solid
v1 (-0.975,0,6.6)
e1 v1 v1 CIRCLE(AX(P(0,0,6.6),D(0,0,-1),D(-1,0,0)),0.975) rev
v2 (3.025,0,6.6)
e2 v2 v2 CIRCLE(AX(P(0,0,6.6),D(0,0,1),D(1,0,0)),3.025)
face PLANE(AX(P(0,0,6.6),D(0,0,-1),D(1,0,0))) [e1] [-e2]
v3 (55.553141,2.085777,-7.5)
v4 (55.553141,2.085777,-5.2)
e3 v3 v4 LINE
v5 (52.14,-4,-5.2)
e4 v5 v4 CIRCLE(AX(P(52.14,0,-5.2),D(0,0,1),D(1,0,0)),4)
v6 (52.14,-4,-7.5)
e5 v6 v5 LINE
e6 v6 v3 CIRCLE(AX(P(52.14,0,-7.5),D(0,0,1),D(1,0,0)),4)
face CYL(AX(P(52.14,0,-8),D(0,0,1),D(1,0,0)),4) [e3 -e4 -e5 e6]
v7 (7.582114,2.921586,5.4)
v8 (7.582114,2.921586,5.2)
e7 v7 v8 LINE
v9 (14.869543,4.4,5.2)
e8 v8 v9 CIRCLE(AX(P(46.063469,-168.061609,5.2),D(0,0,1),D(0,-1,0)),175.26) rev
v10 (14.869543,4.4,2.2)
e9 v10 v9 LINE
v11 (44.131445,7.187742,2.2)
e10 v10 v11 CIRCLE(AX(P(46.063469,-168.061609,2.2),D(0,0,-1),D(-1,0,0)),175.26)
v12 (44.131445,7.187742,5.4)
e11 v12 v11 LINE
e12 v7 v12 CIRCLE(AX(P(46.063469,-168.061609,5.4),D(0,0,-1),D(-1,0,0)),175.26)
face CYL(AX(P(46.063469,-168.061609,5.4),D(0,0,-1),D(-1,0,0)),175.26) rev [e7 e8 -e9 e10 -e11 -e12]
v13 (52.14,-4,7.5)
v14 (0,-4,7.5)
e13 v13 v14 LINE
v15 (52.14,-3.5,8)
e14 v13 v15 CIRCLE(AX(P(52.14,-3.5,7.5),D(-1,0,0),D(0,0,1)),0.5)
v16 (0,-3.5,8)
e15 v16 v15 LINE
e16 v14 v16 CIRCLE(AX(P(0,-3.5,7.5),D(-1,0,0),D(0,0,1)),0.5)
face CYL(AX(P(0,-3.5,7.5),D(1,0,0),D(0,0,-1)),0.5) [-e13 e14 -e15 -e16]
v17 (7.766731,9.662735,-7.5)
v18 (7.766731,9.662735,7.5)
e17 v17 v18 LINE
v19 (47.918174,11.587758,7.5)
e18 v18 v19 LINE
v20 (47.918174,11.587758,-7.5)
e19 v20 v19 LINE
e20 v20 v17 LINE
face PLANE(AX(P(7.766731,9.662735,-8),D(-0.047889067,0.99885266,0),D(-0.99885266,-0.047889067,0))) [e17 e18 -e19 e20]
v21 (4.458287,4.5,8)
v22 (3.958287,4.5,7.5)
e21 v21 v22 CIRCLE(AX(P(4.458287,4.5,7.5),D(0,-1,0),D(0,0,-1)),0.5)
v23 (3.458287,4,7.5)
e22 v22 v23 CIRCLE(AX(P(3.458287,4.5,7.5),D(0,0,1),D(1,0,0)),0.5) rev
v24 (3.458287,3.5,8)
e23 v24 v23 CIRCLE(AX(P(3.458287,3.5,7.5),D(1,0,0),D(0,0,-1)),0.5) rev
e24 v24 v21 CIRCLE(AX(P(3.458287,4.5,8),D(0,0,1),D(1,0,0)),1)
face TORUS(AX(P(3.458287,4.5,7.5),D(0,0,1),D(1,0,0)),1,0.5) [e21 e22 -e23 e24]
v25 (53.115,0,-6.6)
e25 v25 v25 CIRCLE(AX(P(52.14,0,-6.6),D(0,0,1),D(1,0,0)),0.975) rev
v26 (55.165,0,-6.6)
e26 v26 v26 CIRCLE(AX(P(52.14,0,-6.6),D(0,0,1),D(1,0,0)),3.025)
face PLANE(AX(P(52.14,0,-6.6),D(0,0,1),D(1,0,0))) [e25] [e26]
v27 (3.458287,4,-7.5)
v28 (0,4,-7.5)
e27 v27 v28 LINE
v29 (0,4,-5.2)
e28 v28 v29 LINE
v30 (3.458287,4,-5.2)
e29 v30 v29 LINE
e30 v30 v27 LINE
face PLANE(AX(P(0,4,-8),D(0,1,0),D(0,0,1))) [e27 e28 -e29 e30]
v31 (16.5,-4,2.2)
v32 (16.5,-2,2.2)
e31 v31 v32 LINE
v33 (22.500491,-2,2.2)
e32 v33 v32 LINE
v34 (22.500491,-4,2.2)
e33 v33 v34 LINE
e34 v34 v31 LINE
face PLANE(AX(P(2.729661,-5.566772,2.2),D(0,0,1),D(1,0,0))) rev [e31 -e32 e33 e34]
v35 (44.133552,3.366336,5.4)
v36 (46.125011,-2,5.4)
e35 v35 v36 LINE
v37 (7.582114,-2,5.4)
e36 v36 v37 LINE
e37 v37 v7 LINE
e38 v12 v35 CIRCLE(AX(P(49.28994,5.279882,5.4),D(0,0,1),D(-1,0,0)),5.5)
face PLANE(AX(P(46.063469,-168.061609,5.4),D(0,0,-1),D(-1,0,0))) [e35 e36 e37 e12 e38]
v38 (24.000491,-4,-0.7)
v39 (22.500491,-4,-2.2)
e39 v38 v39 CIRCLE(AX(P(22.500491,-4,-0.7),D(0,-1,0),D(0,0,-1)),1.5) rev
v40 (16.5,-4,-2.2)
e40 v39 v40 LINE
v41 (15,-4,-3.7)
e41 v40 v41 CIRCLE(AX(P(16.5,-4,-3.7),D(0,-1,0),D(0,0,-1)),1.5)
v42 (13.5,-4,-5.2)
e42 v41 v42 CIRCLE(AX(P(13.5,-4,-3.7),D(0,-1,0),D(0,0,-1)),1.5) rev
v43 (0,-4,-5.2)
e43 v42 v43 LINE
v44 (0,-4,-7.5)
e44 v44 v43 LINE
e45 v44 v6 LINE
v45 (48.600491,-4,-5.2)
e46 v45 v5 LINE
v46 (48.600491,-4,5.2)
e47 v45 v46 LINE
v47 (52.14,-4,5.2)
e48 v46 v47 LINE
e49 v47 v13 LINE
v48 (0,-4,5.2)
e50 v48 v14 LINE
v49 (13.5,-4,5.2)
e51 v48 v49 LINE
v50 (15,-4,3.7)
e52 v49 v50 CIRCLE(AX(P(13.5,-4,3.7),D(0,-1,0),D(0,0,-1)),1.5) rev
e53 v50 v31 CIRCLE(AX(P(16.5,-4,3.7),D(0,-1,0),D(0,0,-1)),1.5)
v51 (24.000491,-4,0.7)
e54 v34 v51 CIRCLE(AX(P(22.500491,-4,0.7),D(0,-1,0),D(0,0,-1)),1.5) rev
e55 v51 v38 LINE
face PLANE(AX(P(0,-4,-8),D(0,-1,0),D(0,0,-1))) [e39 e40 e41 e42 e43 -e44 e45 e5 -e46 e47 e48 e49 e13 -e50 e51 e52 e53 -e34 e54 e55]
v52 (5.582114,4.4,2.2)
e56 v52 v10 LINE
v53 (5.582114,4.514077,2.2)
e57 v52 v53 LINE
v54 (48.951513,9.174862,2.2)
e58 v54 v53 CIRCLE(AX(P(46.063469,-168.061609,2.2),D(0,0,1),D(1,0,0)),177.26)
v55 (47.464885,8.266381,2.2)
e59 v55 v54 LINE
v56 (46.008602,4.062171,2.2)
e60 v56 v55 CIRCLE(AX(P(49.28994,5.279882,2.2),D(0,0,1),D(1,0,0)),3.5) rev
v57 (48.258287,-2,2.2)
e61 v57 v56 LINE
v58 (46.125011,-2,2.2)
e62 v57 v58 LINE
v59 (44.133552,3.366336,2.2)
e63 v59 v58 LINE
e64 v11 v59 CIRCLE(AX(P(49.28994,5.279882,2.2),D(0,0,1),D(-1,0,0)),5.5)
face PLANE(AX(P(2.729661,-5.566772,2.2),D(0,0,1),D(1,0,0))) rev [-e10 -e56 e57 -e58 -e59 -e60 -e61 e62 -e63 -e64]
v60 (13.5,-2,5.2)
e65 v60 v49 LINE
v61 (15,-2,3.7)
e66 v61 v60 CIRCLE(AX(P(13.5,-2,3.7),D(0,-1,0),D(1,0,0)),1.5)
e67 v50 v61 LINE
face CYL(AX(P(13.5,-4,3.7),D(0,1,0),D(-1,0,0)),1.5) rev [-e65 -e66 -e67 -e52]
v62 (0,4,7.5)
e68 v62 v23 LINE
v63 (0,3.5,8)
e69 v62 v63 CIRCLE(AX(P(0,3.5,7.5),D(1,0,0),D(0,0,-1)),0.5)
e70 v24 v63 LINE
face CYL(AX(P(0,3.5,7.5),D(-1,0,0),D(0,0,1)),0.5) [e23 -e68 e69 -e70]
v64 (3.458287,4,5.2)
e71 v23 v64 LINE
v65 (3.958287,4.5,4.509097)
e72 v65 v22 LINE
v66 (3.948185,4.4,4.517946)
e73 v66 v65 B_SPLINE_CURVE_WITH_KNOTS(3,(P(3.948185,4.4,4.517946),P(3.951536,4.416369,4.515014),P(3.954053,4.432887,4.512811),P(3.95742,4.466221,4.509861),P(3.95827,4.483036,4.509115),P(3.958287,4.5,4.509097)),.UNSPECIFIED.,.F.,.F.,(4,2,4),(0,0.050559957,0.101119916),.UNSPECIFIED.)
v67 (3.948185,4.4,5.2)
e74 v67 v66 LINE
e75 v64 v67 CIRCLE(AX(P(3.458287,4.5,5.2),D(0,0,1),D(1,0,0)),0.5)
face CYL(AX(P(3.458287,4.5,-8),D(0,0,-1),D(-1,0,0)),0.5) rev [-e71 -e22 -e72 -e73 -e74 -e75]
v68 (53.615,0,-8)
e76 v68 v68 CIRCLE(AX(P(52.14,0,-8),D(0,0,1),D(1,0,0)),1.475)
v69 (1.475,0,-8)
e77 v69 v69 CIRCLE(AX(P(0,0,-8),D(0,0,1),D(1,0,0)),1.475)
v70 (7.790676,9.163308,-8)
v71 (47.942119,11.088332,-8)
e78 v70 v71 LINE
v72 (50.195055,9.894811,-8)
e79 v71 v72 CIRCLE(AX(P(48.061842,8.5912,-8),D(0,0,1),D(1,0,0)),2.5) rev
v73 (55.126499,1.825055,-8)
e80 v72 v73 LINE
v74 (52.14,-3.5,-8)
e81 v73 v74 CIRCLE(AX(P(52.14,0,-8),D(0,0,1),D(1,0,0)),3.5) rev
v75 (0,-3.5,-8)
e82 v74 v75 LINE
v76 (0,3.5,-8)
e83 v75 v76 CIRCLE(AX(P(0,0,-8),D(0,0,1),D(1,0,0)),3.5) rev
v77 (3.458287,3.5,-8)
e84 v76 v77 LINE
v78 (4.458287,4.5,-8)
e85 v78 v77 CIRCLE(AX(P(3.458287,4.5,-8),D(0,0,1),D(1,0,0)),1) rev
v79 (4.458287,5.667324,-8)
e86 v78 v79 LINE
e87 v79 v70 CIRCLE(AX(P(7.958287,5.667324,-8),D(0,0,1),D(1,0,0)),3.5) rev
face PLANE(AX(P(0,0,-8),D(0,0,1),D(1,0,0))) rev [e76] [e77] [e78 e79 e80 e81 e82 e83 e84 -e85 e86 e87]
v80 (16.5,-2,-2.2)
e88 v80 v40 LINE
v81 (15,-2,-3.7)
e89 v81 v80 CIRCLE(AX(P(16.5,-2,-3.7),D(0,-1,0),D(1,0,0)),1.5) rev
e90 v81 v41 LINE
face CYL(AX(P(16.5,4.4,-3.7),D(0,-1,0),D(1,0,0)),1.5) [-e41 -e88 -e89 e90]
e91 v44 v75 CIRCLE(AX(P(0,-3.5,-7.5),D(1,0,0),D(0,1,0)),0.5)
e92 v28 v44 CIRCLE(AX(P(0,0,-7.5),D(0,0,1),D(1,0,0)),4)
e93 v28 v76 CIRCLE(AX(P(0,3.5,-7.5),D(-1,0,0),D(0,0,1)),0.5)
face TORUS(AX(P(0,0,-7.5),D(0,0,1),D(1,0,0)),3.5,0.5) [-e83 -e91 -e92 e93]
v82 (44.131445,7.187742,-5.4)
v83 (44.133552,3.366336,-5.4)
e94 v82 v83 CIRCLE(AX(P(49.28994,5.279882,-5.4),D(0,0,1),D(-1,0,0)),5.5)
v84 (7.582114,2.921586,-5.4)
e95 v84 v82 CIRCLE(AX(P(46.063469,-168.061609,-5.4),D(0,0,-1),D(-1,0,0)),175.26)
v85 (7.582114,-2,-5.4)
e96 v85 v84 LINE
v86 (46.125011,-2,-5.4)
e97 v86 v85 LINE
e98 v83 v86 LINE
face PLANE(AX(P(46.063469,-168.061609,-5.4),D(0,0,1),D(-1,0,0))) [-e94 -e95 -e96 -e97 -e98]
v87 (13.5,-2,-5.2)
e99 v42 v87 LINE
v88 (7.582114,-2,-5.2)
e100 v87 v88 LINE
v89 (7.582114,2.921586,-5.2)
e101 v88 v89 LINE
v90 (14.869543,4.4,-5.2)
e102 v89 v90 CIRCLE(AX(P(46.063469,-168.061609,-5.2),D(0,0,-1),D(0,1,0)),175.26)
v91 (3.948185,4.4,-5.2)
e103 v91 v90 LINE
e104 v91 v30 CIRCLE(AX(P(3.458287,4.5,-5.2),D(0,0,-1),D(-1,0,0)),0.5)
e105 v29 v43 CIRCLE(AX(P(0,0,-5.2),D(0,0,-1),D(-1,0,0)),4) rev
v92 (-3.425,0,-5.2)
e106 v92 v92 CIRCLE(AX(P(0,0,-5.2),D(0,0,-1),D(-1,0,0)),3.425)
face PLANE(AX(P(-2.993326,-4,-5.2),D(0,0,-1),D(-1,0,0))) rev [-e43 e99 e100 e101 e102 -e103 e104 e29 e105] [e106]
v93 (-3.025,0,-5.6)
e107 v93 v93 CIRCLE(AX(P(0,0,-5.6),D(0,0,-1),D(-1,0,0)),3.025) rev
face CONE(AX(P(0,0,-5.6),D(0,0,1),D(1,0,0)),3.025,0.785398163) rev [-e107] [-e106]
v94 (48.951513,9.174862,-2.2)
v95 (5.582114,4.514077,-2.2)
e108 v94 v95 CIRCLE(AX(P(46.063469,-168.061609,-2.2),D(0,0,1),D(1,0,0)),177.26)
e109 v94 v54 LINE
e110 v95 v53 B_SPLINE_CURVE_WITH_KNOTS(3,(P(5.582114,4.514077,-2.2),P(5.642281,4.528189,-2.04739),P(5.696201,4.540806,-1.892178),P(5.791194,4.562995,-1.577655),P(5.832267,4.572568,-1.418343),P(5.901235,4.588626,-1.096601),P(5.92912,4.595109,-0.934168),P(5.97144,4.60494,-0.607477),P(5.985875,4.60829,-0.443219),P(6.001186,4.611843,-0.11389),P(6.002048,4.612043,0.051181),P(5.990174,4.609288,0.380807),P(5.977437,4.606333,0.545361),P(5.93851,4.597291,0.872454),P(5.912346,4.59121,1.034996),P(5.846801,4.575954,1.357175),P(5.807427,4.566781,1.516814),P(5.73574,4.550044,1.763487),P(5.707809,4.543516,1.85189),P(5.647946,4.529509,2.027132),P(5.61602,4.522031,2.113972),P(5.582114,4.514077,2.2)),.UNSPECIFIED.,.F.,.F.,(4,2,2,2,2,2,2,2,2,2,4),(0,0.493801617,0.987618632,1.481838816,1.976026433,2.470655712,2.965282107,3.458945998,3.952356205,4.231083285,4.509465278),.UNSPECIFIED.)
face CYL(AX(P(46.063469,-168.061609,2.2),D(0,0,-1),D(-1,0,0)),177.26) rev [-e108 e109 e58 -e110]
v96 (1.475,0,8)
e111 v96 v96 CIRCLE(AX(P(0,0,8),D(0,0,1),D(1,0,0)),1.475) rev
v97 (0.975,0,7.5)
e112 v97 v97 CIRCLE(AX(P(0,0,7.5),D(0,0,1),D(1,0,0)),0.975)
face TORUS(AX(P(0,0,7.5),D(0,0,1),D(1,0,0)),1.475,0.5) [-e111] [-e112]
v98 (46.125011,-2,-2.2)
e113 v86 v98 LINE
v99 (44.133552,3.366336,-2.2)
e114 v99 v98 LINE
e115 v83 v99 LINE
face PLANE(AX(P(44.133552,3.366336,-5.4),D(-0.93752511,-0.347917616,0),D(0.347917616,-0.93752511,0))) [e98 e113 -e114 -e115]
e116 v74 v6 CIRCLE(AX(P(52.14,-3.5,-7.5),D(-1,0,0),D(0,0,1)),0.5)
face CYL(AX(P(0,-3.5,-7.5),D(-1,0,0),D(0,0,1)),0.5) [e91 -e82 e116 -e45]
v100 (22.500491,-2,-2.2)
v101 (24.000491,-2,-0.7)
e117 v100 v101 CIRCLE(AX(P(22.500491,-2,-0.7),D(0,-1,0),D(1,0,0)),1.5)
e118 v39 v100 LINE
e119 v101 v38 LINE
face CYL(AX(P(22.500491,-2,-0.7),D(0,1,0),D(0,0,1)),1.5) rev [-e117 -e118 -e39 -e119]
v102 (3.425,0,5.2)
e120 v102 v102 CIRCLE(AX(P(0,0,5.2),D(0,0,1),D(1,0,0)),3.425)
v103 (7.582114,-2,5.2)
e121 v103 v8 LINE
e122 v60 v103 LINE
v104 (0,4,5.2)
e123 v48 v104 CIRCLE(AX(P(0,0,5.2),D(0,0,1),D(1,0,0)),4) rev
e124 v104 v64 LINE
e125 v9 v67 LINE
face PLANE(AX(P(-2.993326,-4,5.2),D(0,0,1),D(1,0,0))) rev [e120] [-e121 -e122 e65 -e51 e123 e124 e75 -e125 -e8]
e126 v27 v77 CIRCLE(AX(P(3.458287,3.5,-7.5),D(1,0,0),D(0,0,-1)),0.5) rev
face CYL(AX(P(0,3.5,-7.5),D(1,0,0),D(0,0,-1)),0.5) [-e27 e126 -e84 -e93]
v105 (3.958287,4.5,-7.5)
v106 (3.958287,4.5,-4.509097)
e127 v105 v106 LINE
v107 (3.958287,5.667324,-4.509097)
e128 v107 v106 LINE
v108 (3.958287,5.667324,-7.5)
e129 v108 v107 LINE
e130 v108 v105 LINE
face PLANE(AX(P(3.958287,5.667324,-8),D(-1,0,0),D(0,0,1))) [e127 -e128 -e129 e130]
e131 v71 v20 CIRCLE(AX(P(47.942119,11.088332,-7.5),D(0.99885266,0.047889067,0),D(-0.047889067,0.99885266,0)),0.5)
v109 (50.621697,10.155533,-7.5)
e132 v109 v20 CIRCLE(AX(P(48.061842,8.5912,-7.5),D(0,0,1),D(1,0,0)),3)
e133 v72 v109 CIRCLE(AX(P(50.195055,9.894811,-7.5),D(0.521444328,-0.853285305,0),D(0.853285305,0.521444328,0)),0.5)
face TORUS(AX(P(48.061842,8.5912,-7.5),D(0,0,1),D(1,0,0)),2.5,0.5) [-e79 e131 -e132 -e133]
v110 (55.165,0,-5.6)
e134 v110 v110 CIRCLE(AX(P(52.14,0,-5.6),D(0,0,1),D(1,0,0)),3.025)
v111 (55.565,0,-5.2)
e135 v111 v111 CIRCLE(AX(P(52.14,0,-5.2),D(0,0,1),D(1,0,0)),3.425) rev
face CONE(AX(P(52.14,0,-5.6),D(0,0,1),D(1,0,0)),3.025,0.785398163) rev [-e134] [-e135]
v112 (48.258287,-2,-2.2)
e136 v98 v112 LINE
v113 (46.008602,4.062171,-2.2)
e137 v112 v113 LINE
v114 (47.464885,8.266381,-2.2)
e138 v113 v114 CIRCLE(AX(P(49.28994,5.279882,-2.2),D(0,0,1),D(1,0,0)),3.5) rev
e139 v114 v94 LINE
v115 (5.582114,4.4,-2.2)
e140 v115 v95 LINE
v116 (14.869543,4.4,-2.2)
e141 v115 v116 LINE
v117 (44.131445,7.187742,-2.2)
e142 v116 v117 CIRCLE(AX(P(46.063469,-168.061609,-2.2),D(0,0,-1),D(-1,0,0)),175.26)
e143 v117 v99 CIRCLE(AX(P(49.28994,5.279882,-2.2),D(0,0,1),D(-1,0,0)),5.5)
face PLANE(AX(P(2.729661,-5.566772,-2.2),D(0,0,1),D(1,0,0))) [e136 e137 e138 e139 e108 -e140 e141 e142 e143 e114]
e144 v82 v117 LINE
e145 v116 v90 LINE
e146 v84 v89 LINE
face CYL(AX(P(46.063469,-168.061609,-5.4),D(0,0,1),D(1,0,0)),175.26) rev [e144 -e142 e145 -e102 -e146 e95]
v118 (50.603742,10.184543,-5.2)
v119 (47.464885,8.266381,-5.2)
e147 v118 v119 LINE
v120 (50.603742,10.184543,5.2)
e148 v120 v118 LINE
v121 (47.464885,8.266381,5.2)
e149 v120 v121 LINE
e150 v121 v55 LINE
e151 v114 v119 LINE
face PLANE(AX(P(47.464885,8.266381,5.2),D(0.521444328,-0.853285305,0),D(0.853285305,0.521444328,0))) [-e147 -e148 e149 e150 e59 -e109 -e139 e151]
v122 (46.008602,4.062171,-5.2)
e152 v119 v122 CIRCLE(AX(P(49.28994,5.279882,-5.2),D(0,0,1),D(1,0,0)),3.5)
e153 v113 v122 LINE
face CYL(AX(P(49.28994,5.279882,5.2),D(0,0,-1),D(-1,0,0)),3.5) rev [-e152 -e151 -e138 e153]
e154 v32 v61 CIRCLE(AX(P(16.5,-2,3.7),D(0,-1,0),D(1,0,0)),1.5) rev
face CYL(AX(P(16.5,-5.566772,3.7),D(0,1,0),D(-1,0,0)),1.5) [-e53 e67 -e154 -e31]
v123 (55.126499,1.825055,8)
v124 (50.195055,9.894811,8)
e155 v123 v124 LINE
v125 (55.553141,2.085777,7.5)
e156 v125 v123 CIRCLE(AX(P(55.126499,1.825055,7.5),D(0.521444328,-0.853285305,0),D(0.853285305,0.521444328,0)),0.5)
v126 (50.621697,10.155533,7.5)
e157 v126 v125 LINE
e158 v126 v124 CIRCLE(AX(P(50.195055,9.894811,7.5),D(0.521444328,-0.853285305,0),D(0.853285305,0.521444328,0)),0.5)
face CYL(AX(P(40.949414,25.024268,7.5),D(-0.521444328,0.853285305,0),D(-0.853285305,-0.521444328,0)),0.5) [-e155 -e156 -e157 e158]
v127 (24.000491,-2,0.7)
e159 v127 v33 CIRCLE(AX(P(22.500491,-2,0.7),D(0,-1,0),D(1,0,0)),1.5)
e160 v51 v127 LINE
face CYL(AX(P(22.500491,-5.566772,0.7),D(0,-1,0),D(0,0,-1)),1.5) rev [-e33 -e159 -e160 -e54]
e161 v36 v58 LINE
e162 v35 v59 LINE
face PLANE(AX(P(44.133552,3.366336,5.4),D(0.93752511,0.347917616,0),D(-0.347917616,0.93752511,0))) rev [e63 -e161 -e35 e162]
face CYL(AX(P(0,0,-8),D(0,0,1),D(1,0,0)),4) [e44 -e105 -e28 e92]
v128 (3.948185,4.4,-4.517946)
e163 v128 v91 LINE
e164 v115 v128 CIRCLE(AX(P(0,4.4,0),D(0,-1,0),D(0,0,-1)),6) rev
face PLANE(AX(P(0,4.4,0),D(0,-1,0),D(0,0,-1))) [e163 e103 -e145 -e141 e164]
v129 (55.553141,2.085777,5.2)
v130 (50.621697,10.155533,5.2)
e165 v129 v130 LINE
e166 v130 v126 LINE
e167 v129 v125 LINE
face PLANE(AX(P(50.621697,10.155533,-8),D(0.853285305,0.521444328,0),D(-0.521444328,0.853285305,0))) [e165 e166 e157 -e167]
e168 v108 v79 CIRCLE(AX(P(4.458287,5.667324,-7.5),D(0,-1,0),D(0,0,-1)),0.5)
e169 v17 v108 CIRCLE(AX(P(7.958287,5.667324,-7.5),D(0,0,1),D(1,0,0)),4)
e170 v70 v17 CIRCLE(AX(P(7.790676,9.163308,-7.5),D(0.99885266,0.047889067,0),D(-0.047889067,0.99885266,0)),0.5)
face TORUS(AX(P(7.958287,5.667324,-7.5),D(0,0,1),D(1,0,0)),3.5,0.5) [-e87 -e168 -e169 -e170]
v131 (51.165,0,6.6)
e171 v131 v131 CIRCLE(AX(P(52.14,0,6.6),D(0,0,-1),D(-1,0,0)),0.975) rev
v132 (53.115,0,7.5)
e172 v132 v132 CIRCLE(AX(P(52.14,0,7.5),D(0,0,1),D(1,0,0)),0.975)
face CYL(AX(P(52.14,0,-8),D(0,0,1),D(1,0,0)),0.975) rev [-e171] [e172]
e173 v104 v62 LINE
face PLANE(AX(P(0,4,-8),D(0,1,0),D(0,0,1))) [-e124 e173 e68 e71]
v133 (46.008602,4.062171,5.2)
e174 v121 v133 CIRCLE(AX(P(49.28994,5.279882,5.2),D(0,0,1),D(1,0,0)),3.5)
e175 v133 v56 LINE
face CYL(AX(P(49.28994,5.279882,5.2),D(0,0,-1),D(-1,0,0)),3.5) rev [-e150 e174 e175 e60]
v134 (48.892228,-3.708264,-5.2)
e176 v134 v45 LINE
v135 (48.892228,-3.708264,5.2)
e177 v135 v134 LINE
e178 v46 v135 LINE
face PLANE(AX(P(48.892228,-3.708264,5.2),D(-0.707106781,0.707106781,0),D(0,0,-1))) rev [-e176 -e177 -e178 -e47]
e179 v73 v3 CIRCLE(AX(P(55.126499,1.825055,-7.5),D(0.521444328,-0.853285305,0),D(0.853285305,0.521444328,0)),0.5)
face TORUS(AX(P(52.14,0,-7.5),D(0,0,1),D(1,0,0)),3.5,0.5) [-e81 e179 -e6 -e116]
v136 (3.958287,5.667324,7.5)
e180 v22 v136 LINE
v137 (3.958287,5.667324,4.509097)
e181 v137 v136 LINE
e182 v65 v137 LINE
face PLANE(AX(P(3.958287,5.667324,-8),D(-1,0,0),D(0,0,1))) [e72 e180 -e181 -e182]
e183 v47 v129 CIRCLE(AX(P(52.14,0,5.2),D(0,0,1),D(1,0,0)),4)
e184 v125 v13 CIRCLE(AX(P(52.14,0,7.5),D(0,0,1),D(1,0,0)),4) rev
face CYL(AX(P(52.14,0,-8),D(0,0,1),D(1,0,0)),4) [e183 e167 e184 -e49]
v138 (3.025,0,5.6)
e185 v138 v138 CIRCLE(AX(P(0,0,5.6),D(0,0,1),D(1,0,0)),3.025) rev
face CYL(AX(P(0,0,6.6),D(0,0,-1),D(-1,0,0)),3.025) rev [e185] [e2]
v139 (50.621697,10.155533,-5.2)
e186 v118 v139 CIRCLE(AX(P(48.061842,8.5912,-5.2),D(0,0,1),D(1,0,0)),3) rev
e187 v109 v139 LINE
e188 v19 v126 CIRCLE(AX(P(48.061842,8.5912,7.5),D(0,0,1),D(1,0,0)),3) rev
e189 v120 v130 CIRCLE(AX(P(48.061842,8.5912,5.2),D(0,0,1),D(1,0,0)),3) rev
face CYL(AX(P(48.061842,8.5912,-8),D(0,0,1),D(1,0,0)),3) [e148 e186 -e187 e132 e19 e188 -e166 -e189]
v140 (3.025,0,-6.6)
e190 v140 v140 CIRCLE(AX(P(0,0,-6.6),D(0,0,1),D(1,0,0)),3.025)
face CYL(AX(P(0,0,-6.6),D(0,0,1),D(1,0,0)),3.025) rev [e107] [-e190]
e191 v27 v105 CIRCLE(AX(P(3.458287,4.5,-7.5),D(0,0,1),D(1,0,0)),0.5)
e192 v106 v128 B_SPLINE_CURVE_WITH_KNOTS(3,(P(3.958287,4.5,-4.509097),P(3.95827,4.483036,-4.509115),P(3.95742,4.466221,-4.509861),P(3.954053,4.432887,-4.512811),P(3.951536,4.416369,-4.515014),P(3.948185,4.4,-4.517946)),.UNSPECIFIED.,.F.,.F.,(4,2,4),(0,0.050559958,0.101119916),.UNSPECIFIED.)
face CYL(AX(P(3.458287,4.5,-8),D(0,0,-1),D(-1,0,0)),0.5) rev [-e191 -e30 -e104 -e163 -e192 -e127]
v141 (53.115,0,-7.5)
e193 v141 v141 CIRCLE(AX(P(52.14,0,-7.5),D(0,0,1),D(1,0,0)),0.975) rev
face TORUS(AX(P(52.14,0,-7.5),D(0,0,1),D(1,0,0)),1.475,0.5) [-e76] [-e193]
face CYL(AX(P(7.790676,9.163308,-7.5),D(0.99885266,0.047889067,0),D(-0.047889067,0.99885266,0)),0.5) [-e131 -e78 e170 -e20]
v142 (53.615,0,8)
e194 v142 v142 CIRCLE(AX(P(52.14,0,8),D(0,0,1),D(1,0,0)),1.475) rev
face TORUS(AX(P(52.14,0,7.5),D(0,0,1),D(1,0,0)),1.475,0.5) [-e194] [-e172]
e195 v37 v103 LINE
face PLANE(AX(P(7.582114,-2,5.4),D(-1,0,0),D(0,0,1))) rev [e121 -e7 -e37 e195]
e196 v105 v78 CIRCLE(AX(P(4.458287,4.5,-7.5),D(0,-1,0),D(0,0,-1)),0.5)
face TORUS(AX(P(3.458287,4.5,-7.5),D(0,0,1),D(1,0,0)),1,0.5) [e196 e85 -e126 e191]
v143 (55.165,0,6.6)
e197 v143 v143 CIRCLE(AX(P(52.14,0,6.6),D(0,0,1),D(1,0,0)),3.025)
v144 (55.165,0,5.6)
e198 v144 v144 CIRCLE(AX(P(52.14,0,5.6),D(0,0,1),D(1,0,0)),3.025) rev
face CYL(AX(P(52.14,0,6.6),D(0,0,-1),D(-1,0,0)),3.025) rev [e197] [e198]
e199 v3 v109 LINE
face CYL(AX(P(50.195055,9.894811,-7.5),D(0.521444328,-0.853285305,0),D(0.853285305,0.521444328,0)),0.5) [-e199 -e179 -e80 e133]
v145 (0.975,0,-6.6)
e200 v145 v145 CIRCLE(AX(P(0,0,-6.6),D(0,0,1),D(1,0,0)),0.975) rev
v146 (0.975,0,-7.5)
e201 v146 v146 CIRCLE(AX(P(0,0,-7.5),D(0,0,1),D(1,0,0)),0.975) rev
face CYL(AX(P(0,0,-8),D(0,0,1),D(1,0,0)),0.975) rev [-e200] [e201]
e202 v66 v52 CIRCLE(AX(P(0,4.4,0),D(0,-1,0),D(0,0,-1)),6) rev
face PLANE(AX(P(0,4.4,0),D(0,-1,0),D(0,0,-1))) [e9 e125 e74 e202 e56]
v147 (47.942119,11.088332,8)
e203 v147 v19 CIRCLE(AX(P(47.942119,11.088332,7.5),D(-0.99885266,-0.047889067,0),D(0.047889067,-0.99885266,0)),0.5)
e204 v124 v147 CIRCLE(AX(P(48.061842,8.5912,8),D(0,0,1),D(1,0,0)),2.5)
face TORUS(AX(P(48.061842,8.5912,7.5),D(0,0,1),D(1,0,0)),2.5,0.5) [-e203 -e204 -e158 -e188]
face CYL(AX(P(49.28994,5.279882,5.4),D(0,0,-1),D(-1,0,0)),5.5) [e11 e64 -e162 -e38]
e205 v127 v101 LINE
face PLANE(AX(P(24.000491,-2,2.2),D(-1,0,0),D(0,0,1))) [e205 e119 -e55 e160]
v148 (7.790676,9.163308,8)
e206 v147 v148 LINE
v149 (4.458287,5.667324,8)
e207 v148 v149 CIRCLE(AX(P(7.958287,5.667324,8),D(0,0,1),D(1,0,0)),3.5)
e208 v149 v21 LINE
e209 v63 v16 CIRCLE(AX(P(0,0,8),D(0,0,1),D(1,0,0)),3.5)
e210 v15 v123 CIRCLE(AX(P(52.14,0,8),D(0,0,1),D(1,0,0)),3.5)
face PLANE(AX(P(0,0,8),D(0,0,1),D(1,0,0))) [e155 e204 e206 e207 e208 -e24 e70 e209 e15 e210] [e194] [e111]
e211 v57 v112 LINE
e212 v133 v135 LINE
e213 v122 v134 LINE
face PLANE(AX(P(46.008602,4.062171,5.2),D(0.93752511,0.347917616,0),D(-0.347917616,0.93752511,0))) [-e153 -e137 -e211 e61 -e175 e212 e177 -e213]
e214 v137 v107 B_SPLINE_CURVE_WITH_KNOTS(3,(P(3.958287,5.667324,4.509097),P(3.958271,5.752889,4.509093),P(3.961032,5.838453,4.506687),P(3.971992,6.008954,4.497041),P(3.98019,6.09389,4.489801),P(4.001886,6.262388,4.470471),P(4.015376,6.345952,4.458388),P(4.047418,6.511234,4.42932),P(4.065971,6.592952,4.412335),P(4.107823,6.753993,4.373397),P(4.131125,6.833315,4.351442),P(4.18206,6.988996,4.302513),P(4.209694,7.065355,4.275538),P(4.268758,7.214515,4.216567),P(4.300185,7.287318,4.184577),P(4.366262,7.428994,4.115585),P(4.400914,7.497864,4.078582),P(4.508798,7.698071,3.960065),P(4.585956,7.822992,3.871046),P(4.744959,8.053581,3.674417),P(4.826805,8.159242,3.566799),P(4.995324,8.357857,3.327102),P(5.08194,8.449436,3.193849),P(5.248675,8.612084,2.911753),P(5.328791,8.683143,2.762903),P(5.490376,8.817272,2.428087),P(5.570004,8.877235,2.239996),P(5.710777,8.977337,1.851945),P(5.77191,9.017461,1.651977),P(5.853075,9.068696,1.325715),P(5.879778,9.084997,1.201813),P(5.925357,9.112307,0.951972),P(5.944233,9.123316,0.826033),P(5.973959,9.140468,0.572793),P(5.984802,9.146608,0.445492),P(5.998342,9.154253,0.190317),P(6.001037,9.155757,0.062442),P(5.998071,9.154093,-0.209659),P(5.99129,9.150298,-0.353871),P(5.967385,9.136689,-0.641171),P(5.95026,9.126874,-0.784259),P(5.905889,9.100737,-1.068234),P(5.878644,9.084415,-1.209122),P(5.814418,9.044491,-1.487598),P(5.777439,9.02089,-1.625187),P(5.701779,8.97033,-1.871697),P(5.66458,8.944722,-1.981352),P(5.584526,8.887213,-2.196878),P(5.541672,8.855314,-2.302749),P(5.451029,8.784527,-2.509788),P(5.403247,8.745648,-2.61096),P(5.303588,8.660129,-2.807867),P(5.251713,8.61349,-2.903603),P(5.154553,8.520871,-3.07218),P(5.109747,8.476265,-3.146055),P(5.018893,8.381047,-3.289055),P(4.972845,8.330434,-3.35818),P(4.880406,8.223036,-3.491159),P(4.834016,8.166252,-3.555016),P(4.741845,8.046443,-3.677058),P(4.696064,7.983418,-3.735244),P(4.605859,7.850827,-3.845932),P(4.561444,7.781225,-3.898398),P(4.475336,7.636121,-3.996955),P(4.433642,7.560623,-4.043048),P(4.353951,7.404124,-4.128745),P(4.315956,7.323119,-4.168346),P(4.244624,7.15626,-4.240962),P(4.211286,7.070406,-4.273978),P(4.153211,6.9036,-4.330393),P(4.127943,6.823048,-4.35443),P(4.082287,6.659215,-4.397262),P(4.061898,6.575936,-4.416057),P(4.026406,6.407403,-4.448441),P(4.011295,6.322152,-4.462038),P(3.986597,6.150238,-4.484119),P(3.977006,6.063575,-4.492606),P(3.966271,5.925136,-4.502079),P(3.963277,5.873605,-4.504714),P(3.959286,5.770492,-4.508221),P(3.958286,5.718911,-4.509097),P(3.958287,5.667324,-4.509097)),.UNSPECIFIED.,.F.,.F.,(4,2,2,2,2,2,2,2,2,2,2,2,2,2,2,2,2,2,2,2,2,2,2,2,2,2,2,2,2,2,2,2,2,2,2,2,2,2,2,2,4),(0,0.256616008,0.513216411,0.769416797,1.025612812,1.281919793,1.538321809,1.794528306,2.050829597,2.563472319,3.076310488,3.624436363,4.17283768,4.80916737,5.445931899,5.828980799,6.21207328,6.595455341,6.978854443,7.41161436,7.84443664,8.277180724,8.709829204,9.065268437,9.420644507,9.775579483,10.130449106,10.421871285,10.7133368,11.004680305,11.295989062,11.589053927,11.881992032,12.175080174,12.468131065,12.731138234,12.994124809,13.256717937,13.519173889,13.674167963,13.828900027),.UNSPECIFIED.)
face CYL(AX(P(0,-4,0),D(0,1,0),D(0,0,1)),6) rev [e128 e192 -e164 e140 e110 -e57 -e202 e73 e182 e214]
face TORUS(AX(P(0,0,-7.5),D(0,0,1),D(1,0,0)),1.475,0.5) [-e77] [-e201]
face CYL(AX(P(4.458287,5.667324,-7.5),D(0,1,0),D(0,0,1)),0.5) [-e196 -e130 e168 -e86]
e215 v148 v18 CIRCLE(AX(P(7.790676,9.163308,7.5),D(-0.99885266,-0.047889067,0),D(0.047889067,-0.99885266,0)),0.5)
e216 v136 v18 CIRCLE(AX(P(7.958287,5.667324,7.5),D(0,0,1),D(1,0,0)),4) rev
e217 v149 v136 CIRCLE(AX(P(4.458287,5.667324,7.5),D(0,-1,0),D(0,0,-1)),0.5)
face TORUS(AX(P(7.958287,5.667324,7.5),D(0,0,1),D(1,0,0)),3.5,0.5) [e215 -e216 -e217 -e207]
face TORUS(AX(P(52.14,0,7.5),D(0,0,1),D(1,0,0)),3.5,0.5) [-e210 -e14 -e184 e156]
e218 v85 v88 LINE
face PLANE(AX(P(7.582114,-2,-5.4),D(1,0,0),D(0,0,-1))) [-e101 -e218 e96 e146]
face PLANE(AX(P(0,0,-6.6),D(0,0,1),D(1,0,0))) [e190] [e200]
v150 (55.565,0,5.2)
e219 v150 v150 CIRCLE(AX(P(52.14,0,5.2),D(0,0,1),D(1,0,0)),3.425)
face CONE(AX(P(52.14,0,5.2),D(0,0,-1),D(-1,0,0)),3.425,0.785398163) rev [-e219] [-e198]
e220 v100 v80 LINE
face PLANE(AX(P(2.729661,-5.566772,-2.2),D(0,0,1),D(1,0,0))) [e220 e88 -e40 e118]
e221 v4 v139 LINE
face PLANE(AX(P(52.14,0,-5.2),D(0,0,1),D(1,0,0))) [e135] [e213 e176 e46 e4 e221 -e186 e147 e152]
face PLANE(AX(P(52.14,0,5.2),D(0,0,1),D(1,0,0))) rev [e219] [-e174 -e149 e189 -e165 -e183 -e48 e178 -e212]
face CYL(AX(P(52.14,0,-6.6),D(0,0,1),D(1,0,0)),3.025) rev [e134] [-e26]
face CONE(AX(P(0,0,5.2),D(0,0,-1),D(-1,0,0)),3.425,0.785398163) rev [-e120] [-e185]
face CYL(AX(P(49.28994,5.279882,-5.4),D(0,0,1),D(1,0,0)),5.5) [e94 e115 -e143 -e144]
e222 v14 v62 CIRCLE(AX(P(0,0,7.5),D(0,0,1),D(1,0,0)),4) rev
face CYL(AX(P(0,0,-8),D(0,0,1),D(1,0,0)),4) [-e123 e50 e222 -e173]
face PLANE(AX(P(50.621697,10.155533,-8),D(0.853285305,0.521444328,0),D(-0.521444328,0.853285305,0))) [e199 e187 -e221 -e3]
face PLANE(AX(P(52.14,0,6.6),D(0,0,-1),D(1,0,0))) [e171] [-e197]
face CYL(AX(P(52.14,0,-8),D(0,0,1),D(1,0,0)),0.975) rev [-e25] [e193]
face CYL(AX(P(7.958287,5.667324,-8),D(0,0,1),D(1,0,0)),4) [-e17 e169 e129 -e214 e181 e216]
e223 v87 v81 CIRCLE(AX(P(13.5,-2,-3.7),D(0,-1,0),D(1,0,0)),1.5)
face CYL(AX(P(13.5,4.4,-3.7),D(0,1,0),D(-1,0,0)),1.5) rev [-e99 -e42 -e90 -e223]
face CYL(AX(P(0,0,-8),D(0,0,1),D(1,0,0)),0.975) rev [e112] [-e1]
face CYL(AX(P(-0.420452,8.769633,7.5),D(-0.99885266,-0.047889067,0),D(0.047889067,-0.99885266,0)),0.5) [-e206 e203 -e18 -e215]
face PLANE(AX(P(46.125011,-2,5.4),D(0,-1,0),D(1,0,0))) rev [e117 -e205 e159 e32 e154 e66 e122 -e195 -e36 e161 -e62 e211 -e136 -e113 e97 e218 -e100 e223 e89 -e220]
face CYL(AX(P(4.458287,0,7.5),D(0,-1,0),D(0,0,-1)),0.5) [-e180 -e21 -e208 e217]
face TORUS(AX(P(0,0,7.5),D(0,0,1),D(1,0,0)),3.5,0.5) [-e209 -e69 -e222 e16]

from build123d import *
from OCP.BRepFilletAPI import BRepFilletAPI_MakeChamfer

# Parameters (mm, degrees)
EXTRUDE_1_DEPTH          = 8
EXTRUDE_1_DEPTH_BACK     = 8
CUT_EXTRUDE_1_DEPTH      = 2.2
CUT_EXTRUDE_1_DEPTH_BACK = 2.2
CUT_EXTRUDE_2_DEPTH      = 58.87966418
CUT_EXTRUDE_2_DEPTH_BACK = 58.87966418
SKETCH_3_R               = 0.975
CUT_EXTRUDE_5_DEPTH      = 58.268661587
CUT_EXTRUDE_5_DEPTH_BACK = 58.268661587
CUT_EXTRUDE_6_DEPTH      = 5.2
CUT_EXTRUDE_6_DEPTH_BACK = 5.2
SKETCH_6_R               = 3.025
CUT_EXTRUDE_7_DEPTH      = 1.4
SKETCH_7_R               = 3.025
CUT_EXTRUDE_8_DEPTH      = 1.4
CUT_EXTRUDE_10_DEPTH     = 3.2
SKETCH_8_W               = 15
SKETCH_8_H               = 10.4
CUT_EXTRUDE_9_DEPTH      = 8.4
SKETCH_10_W              = 25
SKETCH_10_H              = 4.4
EXTRUDE_2_DEPTH          = 2
CUT_EXTRUDE_11_DEPTH     = 4.5
FILLET_2_R               = 0.5
CHAMFER_1_SIZE           = 0.4
CHAMFER_1_SIZE2          = 0.311176836
FILLET_3_R               = 1.5


with BuildPart() as part:
    # 草图1 → 凸台-拉伸1 (new, two sides: drawn at the far end of the back side and taken through both)
    with BuildSketch(Plane.XY.offset(-EXTRUDE_1_DEPTH_BACK)):
        with BuildLine():
            Line((0, -4), (52.14, -4))
            ThreePointArc((52.14, -4), (55.62877552, -1.95664135), (55.553141222, 2.085777314))
            Line((55.553141222, 2.085777314), (50.621697444, 10.155533337))
            ThreePointArc((50.621697444, 10.155533337), (49.466230751, 11.242179588), (47.918174328, 11.587758333))
            Line((47.918174328, 11.587758333), (7.766731223, 9.662734546))
            ThreePointArc((7.766731223, 9.662734546), (5.062926971, 8.427194819), (3.958287489, 5.667323904))
            Line((3.958287489, 5.667323904), (3.958287489, 4))
            Line((3.958287489, 4), (0, 4))
            ThreePointArc((0, 4), (-4, 0), (0, -4))
        make_face()
    extrude(amount=EXTRUDE_1_DEPTH + EXTRUDE_1_DEPTH_BACK)

    # 草图2 → 切除-拉伸1 (cut, two sides: drawn at the far end of the back side and taken through both)
    with BuildSketch(Plane.XY.offset(-CUT_EXTRUDE_1_DEPTH_BACK)):
        with BuildLine():
            Line((-1.528760289, -3.696334939), (0.036061068, -6.887575742))
            ThreePointArc((0.036061068, -6.887575742), (2.795380789, -8.566052308), (5.478529806, -6.768320332))
            ThreePointArc((5.478529806, -6.768320332), (6.228661924, -5.326880509), (7.166657167, -4))
            Line((7.166657167, -4), (52.14, -4))
            ThreePointArc((52.14, -4), (55.62877552, -1.95664135), (55.553141222, 2.085777314))
            Line((55.553141222, 2.085777314), (52.700312321, 6.754112641))
            ThreePointArc((52.700312321, 6.754112641), (51.683787236, 8.461058728), (49.823530783, 9.15850702))
            ThreePointArc((49.823530783, 9.15850702), (26.4662767, 8.111764825), (3.449969925, 4))
            Line((3.449969925, 4), (0, 4))
            ThreePointArc((0, 4), (-3.923349319, 0.779313879), (-1.528760289, -3.696334939))
        make_face()
    extrude(amount=CUT_EXTRUDE_1_DEPTH + CUT_EXTRUDE_1_DEPTH_BACK, mode=Mode.SUBTRACT)

    # 草图3 → 切除-拉伸2 (cut, two sides: drawn at the far end of the back side and taken through both)
    with BuildSketch(Plane.XY.offset(-CUT_EXTRUDE_2_DEPTH_BACK)):
        Circle(SKETCH_3_R)
        with Locations((52.14, 0)):
            Circle(SKETCH_3_R)
    extrude(amount=CUT_EXTRUDE_2_DEPTH + CUT_EXTRUDE_2_DEPTH_BACK, mode=Mode.SUBTRACT)

    # 草图4 → 切除-拉伸5 (cut, two sides: drawn at the far end of the back side and taken through both)
    with BuildSketch(Plane(origin=(0, 4, 0), x_dir=(1, 0, 0), z_dir=(0, 1, 0)).offset(-CUT_EXTRUDE_5_DEPTH_BACK)):
        with BuildLine():
            Line((-2.993325909, 5.2), (2.993325909, 5.2))
            ThreePointArc((2.993325909, 5.2), (6, 0), (2.993325909, -5.2))
            Line((2.993325909, -5.2), (-2.993325909, -5.2))
            Line((-2.993325909, -5.2), (-6.83658322, -5.2))
            Line((-6.83658322, -5.2), (-6.83658322, 5.2))
            Line((-6.83658322, 5.2), (-2.993325909, 5.2))
        make_face()
    extrude(amount=CUT_EXTRUDE_5_DEPTH + CUT_EXTRUDE_5_DEPTH_BACK, mode=Mode.SUBTRACT)

    # 草图5 → 切除-拉伸6 (cut, two sides: drawn at the far end of the back side and taken through both)
    with BuildSketch(Plane.XY.offset(-CUT_EXTRUDE_6_DEPTH_BACK)):
        with BuildLine():
            Line((52.14, -4), (49.000491406, -4))
            Line((49.000491406, -4), (46.008602218, 4.062170784))
            ThreePointArc((46.008602218, 4.062170784), (45.982727023, 6.425457247), (47.464884955, 8.26638101))
            Line((47.464884955, 8.26638101), (50.603907824, 10.184644059))
            Line((50.603907824, 10.184644059), (55.553141222, 2.085777314))
            ThreePointArc((55.553141222, 2.085777314), (55.62877552, -1.95664135), (52.14, -4))
        make_face()
    extrude(amount=CUT_EXTRUDE_6_DEPTH + CUT_EXTRUDE_6_DEPTH_BACK, mode=Mode.SUBTRACT)

    # 草图6 → 切除-拉伸7 (cut)
    with BuildSketch(Plane.XY.offset(-5.2)):
        Circle(SKETCH_6_R)
    cut_extrude_7 = extrude(amount=-CUT_EXTRUDE_7_DEPTH, mode=Mode.SUBTRACT)

    # 草图7 → 切除-拉伸8 (cut)
    with BuildSketch(Plane.XY.offset(-5.2)):
        with Locations((52.14, 0)):
            Circle(SKETCH_7_R)
    cut_extrude_8 = extrude(amount=-CUT_EXTRUDE_8_DEPTH, mode=Mode.SUBTRACT)

    # 草图9 → 切除-拉伸10 (cut)
    with BuildSketch(Plane(origin=(0, 0, 2.2), x_dir=(-1, 0, 0), z_dir=(0, 0, -1))):
        with BuildLine():
            Line((-7.582114295, -2), (-7.582114295, 2.921585889))
            ThreePointArc((-7.582114295, 2.921585889), (-25.744504477, 6.016555259), (-44.13144482, 7.187741556))
            ThreePointArc((-44.13144482, 7.187741556), (-43.78994094, 5.276849663), (-44.133551998, 3.366335552))
            Line((-44.133551998, 3.366335552), (-46.125010842, -2))
            Line((-46.125010842, -2), (-7.582114295, -2))
        make_face()
    cut_extrude_10 = extrude(amount=-CUT_EXTRUDE_10_DEPTH, mode=Mode.SUBTRACT)

    # 镜向1: 切除-拉伸7, 切除-拉伸8, 切除-拉伸10 across plane
    add(cut_extrude_7.mirror(Plane.XY), mode=Mode.SUBTRACT)
    add(cut_extrude_8.mirror(Plane.XY), mode=Mode.SUBTRACT)
    add(cut_extrude_10.mirror(Plane.XY), mode=Mode.SUBTRACT)

    # 草图8 → 切除-拉伸9 (cut)
    with BuildSketch(Plane.XZ.offset(4)):
        with Locations((7.5, 0)):
            Rectangle(SKETCH_8_W, SKETCH_8_H)
    extrude(amount=-CUT_EXTRUDE_9_DEPTH, mode=Mode.SUBTRACT)

    # 草图10 → 凸台-拉伸2 (add)
    with BuildSketch(Plane.XZ.offset(4)):
        with Locations((36.500491406, 0)):
            Rectangle(SKETCH_10_W, SKETCH_10_H)
    extrude(amount=-EXTRUDE_2_DEPTH)

    # 草图11 → 切除-拉伸11 (cut)
    with BuildSketch(Plane(origin=(0, 0, -2.2), x_dir=(-1, 0, 0), z_dir=(0, 0, -1))):
        Polygon((-49.000491406, -2), (-49.000491406, -4), (-48.258287037, -2), align=None)
    extrude(amount=-CUT_EXTRUDE_11_DEPTH, mode=Mode.SUBTRACT)

    # 圆角2
    fillet_2_edges = [part.edges().sort_by_distance(p)[0] for p in [
        (26.07, -4, -8),
        (55.62877552, -1.95664135, -8),
        (53.087419333, 6.120655325, -8),
        (49.466230751, 11.242179588, -8),
        (27.842452776, 10.625246439, -8),
        (5.062926971, 8.427194819, -8),
        (3.958287489, 4.833661952, -8),
        (1.979143745, 4, -8),
        (-4, 0, -8),
        (51.165, 0, -8),
        (-0.975, 0, -8),
        (1.979143745, 4, 8),
        (3.958287489, 4.833661952, 8),
        (5.062926971, 8.427194819, 8),
        (27.842452776, 10.625246439, 8),
        (49.466230751, 11.242179588, 8),
        (53.087419333, 6.120655325, 8),
        (55.62877552, -1.95664135, 8),
        (26.07, -4, 8),
        (-4, 0, 8),
        (51.165, 0, 8),
        (-0.975, 0, 8),
        (3.958287489, 4, 6.6),
        (3.958287489, 4, -6.6),
    ]]
    fillet(fillet_2_edges, radius=FILLET_2_R)

    # 倒角1: one chamfer whose edges measure the first distance from different faces: ONE call of the kernel's chamfer builder (chamfer() names one face for all edges)
    chamfer_1_edges_1 = [part.edges().sort_by_distance(p)[0] for p in [
        (49.000491406, -4, 0),
    ]]
    chamfer_1_side_1 = [part.faces().sort_by_distance(p)[0] for p in [
        (30.325944119, -4, 0),
    ]]
    chamfer_1_edges_2 = [part.edges().sort_by_distance(p)[0] for p in [
        (-3.025, 0, -5.2),
        (49.115, 0, -5.2),
        (-3.025, 0, 5.2),
        (49.115, 0, 5.2),
    ]]
    chamfer_1 = BRepFilletAPI_MakeChamfer(part.part.solid().wrapped)
    for e in chamfer_1_edges_1:
        chamfer_1.Add(CHAMFER_1_SIZE, CHAMFER_1_SIZE2, e.wrapped, chamfer_1_side_1[0].wrapped)  # the first distance lies on this face
    for e in chamfer_1_edges_2:
        chamfer_1.Add(CHAMFER_1_SIZE, e.wrapped)
    add(Compound.cast(chamfer_1.Shape()), mode=Mode.REPLACE)

    # 圆角3
    fillet_3_edges = [part.edges().sort_by_distance(p)[0] for p in [
        (15, -3, -5.2),
        (24.000491406, -3, -2.2),
        (24.000491406, -3, 2.2),
        (15, -3, 5.2),
        (15, -3, -2.2),
        (15, -3, 2.2),
    ]]
    fillet(fillet_3_edges, radius=FILLET_3_R - 0.0001)  # a hair under: the kernel refuses the full size


solid = part.part
